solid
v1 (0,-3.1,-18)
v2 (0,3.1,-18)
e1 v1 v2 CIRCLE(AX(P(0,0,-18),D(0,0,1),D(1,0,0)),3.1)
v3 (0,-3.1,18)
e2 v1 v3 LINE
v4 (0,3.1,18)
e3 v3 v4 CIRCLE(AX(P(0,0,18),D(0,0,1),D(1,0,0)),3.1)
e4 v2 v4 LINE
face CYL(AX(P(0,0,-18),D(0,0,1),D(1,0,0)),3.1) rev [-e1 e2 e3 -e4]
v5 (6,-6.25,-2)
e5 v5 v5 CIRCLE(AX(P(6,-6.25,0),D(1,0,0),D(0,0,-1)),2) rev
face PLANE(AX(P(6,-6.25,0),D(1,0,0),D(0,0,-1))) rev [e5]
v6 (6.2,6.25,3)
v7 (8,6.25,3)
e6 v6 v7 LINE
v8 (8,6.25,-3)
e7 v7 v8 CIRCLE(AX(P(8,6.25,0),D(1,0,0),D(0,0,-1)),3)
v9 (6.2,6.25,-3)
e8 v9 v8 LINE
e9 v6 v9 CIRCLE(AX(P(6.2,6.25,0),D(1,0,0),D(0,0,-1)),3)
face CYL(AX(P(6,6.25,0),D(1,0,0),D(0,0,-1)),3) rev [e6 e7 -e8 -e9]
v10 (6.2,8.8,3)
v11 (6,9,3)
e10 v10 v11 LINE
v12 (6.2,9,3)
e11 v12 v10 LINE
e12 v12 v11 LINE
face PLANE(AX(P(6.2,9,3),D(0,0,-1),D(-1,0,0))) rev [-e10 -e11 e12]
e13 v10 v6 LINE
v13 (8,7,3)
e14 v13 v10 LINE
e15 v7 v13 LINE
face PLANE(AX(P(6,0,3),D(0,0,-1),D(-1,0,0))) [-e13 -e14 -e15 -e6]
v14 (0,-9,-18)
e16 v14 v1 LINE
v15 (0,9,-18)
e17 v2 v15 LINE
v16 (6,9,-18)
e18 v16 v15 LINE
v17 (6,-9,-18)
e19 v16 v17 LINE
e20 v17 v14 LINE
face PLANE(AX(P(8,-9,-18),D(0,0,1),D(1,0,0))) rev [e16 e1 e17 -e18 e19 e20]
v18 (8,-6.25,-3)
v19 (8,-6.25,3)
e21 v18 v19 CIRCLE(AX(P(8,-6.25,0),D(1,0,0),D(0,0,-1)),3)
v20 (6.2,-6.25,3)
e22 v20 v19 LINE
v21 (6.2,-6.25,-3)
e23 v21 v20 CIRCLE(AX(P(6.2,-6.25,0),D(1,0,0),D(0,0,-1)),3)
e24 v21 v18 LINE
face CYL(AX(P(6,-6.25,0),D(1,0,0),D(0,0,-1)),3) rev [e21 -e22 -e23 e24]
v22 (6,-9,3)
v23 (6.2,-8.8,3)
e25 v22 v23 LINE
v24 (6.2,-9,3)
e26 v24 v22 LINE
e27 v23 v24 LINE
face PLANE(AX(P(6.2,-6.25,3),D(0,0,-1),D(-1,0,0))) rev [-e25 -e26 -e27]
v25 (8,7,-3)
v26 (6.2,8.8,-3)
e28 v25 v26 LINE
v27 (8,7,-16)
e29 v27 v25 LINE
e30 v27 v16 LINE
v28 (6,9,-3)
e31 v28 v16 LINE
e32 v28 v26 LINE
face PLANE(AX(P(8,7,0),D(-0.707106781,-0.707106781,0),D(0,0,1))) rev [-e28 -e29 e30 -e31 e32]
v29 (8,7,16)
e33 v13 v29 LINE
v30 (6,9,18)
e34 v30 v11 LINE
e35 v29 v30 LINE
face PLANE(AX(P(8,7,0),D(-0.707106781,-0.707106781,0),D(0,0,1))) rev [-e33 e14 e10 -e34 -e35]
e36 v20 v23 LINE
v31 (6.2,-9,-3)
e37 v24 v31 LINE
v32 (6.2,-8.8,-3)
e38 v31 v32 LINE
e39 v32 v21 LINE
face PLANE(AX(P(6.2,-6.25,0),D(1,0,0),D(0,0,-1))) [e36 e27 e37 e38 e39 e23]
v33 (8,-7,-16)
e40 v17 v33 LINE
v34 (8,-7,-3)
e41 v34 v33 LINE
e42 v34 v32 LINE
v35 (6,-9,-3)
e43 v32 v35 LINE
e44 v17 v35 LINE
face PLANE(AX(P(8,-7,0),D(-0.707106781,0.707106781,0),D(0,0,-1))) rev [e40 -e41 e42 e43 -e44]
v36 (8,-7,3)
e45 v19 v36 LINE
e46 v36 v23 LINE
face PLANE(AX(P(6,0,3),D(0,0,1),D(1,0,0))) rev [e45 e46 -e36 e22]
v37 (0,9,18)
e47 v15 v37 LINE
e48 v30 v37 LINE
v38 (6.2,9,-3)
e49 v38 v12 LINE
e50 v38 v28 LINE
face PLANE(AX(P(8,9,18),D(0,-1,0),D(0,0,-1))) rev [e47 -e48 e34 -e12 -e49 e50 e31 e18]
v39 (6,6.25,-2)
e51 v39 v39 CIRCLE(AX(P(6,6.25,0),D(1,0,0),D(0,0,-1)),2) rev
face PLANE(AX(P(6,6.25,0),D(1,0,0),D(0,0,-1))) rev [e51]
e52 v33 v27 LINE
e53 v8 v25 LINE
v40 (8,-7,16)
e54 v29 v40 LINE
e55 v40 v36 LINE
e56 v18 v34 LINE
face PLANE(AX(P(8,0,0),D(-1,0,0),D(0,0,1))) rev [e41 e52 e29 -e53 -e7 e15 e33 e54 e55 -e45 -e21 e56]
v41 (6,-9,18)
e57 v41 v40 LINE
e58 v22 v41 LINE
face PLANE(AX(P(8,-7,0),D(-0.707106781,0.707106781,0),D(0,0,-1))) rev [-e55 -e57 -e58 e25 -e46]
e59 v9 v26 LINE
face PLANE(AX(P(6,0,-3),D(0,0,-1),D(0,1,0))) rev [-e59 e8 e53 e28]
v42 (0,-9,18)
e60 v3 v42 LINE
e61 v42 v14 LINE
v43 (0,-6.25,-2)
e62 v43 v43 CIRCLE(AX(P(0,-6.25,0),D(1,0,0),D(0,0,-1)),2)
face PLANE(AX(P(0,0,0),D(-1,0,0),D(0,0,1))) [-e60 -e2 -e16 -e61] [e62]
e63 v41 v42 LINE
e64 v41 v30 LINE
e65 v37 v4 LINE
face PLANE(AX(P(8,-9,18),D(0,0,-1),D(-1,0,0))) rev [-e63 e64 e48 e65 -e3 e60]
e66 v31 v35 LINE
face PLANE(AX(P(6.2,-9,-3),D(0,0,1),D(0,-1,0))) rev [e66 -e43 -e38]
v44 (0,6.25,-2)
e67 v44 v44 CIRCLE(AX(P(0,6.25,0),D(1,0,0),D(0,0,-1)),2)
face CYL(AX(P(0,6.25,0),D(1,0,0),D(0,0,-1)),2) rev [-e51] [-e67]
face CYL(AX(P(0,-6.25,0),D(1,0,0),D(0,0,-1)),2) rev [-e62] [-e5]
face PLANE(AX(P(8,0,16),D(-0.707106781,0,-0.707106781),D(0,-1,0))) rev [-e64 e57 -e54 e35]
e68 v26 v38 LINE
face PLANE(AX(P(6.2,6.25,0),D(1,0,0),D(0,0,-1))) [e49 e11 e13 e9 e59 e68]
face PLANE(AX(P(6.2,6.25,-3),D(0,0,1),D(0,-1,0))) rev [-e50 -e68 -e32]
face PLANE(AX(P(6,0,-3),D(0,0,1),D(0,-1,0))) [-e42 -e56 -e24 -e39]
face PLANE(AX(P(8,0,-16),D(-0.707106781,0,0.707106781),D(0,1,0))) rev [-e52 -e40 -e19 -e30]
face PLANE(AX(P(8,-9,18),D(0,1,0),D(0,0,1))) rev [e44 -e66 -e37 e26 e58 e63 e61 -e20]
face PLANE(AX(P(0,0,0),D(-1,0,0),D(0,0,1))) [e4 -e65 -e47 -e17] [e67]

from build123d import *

# Parameters (mm, degrees)
SKETCH_1_W          = 36
SKETCH_1_H          = 18
EXTRUDE_1_DEPTH     = 8
CUT_EXTRUDE_1_DEPTH = 38.960505792
CHAMFER_1_SIZE      = 2
SKETCH_3_R          = 2
CUT_EXTRUDE_2_DEPTH = 22.656407828
CUT_EXTRUDE_3_DEPTH = 2
EXTRUDE_START       = 0.2
EXTRUDE_2_DEPTH     = 0.2


with BuildPart() as part:
    # Эскиз1 → Бобышка-Вытянуть1 (new body)
    with BuildSketch(Plane(origin=(0, 0, 0), x_dir=(0, 0, -1), z_dir=(1, 0, 0))):
        Rectangle(SKETCH_1_W, SKETCH_1_H)
    extrude(amount=EXTRUDE_1_DEPTH)

    # Эскиз2 → Вырез-Вытянуть1 (cut, through all)
    with BuildSketch(Plane.XY.offset(18)):
        with BuildLine():
            ThreePointArc((0, -3.1), (3.1, 0), (0, 3.1))
            Line((0, 3.1), (0, -3.1))
        make_face()
    extrude(amount=-CUT_EXTRUDE_1_DEPTH, mode=Mode.SUBTRACT)

    # Фаска1
    chamfer_1_edges = [part.edges().sort_by_distance(p)[0] for p in [
        (8, 0, 18),
        (8, -9, 0),
        (8, 0, -18),
        (8, 9, 0),
    ]]
    chamfer(chamfer_1_edges, length=CHAMFER_1_SIZE)

    # Эскиз3 → Вырез-Вытянуть2 (cut, through all)
    with BuildSketch(Plane(origin=(8, 0, 0), x_dir=(0, 0, -1), z_dir=(1, 0, 0))):
        with Locations((0, -6.25)):
            Circle(SKETCH_3_R)
        with Locations((0, 6.25)):
            Circle(SKETCH_3_R)
    extrude(amount=-CUT_EXTRUDE_2_DEPTH, mode=Mode.SUBTRACT)

    # Эскиз4 → Вырез-Вытянуть3 (cut)
    with BuildSketch(Plane(origin=(8, 0, 0), x_dir=(0, 0, -1), z_dir=(1, 0, 0))):
        with BuildLine():
            Line((-3, 9), (-3, 6.25))
            ThreePointArc((-3, 6.25), (0, 3.25), (3, 6.25))
            Line((3, 6.25), (3, 9))
            Line((3, 9), (-3, 9))
        make_face()
        with BuildLine():
            Line((3, -9), (3, -6.25))
            ThreePointArc((3, -6.25), (0, -3.25), (-3, -6.25))
            Line((-3, -6.25), (-3, -9))
            Line((-3, -9), (3, -9))
        make_face()
    extrude(amount=-CUT_EXTRUDE_3_DEPTH, mode=Mode.SUBTRACT)

    # Эскиз5 → Бобышка-Вытянуть2 (add)
    with BuildSketch(Plane(origin=(6, 0, 0), x_dir=(0, 0, -1), z_dir=(1, 0, 0)).offset(EXTRUDE_START)):
        with BuildLine():
            Line((3, 9), (-3, 9))
            Line((-3, 9), (-3, 6.25))
            ThreePointArc((-3, 6.25), (0, 3.25), (3, 6.25))
            Line((3, 6.25), (3, 9))
        make_face()
        with BuildLine():
            Line((-3, -9), (3, -9))
            Line((3, -9), (3, -6.25))
            ThreePointArc((3, -6.25), (0, -3.25), (-3, -6.25))
            Line((-3, -6.25), (-3, -9))
        make_face()
    extrude(amount=-EXTRUDE_2_DEPTH)


solid = part.part
